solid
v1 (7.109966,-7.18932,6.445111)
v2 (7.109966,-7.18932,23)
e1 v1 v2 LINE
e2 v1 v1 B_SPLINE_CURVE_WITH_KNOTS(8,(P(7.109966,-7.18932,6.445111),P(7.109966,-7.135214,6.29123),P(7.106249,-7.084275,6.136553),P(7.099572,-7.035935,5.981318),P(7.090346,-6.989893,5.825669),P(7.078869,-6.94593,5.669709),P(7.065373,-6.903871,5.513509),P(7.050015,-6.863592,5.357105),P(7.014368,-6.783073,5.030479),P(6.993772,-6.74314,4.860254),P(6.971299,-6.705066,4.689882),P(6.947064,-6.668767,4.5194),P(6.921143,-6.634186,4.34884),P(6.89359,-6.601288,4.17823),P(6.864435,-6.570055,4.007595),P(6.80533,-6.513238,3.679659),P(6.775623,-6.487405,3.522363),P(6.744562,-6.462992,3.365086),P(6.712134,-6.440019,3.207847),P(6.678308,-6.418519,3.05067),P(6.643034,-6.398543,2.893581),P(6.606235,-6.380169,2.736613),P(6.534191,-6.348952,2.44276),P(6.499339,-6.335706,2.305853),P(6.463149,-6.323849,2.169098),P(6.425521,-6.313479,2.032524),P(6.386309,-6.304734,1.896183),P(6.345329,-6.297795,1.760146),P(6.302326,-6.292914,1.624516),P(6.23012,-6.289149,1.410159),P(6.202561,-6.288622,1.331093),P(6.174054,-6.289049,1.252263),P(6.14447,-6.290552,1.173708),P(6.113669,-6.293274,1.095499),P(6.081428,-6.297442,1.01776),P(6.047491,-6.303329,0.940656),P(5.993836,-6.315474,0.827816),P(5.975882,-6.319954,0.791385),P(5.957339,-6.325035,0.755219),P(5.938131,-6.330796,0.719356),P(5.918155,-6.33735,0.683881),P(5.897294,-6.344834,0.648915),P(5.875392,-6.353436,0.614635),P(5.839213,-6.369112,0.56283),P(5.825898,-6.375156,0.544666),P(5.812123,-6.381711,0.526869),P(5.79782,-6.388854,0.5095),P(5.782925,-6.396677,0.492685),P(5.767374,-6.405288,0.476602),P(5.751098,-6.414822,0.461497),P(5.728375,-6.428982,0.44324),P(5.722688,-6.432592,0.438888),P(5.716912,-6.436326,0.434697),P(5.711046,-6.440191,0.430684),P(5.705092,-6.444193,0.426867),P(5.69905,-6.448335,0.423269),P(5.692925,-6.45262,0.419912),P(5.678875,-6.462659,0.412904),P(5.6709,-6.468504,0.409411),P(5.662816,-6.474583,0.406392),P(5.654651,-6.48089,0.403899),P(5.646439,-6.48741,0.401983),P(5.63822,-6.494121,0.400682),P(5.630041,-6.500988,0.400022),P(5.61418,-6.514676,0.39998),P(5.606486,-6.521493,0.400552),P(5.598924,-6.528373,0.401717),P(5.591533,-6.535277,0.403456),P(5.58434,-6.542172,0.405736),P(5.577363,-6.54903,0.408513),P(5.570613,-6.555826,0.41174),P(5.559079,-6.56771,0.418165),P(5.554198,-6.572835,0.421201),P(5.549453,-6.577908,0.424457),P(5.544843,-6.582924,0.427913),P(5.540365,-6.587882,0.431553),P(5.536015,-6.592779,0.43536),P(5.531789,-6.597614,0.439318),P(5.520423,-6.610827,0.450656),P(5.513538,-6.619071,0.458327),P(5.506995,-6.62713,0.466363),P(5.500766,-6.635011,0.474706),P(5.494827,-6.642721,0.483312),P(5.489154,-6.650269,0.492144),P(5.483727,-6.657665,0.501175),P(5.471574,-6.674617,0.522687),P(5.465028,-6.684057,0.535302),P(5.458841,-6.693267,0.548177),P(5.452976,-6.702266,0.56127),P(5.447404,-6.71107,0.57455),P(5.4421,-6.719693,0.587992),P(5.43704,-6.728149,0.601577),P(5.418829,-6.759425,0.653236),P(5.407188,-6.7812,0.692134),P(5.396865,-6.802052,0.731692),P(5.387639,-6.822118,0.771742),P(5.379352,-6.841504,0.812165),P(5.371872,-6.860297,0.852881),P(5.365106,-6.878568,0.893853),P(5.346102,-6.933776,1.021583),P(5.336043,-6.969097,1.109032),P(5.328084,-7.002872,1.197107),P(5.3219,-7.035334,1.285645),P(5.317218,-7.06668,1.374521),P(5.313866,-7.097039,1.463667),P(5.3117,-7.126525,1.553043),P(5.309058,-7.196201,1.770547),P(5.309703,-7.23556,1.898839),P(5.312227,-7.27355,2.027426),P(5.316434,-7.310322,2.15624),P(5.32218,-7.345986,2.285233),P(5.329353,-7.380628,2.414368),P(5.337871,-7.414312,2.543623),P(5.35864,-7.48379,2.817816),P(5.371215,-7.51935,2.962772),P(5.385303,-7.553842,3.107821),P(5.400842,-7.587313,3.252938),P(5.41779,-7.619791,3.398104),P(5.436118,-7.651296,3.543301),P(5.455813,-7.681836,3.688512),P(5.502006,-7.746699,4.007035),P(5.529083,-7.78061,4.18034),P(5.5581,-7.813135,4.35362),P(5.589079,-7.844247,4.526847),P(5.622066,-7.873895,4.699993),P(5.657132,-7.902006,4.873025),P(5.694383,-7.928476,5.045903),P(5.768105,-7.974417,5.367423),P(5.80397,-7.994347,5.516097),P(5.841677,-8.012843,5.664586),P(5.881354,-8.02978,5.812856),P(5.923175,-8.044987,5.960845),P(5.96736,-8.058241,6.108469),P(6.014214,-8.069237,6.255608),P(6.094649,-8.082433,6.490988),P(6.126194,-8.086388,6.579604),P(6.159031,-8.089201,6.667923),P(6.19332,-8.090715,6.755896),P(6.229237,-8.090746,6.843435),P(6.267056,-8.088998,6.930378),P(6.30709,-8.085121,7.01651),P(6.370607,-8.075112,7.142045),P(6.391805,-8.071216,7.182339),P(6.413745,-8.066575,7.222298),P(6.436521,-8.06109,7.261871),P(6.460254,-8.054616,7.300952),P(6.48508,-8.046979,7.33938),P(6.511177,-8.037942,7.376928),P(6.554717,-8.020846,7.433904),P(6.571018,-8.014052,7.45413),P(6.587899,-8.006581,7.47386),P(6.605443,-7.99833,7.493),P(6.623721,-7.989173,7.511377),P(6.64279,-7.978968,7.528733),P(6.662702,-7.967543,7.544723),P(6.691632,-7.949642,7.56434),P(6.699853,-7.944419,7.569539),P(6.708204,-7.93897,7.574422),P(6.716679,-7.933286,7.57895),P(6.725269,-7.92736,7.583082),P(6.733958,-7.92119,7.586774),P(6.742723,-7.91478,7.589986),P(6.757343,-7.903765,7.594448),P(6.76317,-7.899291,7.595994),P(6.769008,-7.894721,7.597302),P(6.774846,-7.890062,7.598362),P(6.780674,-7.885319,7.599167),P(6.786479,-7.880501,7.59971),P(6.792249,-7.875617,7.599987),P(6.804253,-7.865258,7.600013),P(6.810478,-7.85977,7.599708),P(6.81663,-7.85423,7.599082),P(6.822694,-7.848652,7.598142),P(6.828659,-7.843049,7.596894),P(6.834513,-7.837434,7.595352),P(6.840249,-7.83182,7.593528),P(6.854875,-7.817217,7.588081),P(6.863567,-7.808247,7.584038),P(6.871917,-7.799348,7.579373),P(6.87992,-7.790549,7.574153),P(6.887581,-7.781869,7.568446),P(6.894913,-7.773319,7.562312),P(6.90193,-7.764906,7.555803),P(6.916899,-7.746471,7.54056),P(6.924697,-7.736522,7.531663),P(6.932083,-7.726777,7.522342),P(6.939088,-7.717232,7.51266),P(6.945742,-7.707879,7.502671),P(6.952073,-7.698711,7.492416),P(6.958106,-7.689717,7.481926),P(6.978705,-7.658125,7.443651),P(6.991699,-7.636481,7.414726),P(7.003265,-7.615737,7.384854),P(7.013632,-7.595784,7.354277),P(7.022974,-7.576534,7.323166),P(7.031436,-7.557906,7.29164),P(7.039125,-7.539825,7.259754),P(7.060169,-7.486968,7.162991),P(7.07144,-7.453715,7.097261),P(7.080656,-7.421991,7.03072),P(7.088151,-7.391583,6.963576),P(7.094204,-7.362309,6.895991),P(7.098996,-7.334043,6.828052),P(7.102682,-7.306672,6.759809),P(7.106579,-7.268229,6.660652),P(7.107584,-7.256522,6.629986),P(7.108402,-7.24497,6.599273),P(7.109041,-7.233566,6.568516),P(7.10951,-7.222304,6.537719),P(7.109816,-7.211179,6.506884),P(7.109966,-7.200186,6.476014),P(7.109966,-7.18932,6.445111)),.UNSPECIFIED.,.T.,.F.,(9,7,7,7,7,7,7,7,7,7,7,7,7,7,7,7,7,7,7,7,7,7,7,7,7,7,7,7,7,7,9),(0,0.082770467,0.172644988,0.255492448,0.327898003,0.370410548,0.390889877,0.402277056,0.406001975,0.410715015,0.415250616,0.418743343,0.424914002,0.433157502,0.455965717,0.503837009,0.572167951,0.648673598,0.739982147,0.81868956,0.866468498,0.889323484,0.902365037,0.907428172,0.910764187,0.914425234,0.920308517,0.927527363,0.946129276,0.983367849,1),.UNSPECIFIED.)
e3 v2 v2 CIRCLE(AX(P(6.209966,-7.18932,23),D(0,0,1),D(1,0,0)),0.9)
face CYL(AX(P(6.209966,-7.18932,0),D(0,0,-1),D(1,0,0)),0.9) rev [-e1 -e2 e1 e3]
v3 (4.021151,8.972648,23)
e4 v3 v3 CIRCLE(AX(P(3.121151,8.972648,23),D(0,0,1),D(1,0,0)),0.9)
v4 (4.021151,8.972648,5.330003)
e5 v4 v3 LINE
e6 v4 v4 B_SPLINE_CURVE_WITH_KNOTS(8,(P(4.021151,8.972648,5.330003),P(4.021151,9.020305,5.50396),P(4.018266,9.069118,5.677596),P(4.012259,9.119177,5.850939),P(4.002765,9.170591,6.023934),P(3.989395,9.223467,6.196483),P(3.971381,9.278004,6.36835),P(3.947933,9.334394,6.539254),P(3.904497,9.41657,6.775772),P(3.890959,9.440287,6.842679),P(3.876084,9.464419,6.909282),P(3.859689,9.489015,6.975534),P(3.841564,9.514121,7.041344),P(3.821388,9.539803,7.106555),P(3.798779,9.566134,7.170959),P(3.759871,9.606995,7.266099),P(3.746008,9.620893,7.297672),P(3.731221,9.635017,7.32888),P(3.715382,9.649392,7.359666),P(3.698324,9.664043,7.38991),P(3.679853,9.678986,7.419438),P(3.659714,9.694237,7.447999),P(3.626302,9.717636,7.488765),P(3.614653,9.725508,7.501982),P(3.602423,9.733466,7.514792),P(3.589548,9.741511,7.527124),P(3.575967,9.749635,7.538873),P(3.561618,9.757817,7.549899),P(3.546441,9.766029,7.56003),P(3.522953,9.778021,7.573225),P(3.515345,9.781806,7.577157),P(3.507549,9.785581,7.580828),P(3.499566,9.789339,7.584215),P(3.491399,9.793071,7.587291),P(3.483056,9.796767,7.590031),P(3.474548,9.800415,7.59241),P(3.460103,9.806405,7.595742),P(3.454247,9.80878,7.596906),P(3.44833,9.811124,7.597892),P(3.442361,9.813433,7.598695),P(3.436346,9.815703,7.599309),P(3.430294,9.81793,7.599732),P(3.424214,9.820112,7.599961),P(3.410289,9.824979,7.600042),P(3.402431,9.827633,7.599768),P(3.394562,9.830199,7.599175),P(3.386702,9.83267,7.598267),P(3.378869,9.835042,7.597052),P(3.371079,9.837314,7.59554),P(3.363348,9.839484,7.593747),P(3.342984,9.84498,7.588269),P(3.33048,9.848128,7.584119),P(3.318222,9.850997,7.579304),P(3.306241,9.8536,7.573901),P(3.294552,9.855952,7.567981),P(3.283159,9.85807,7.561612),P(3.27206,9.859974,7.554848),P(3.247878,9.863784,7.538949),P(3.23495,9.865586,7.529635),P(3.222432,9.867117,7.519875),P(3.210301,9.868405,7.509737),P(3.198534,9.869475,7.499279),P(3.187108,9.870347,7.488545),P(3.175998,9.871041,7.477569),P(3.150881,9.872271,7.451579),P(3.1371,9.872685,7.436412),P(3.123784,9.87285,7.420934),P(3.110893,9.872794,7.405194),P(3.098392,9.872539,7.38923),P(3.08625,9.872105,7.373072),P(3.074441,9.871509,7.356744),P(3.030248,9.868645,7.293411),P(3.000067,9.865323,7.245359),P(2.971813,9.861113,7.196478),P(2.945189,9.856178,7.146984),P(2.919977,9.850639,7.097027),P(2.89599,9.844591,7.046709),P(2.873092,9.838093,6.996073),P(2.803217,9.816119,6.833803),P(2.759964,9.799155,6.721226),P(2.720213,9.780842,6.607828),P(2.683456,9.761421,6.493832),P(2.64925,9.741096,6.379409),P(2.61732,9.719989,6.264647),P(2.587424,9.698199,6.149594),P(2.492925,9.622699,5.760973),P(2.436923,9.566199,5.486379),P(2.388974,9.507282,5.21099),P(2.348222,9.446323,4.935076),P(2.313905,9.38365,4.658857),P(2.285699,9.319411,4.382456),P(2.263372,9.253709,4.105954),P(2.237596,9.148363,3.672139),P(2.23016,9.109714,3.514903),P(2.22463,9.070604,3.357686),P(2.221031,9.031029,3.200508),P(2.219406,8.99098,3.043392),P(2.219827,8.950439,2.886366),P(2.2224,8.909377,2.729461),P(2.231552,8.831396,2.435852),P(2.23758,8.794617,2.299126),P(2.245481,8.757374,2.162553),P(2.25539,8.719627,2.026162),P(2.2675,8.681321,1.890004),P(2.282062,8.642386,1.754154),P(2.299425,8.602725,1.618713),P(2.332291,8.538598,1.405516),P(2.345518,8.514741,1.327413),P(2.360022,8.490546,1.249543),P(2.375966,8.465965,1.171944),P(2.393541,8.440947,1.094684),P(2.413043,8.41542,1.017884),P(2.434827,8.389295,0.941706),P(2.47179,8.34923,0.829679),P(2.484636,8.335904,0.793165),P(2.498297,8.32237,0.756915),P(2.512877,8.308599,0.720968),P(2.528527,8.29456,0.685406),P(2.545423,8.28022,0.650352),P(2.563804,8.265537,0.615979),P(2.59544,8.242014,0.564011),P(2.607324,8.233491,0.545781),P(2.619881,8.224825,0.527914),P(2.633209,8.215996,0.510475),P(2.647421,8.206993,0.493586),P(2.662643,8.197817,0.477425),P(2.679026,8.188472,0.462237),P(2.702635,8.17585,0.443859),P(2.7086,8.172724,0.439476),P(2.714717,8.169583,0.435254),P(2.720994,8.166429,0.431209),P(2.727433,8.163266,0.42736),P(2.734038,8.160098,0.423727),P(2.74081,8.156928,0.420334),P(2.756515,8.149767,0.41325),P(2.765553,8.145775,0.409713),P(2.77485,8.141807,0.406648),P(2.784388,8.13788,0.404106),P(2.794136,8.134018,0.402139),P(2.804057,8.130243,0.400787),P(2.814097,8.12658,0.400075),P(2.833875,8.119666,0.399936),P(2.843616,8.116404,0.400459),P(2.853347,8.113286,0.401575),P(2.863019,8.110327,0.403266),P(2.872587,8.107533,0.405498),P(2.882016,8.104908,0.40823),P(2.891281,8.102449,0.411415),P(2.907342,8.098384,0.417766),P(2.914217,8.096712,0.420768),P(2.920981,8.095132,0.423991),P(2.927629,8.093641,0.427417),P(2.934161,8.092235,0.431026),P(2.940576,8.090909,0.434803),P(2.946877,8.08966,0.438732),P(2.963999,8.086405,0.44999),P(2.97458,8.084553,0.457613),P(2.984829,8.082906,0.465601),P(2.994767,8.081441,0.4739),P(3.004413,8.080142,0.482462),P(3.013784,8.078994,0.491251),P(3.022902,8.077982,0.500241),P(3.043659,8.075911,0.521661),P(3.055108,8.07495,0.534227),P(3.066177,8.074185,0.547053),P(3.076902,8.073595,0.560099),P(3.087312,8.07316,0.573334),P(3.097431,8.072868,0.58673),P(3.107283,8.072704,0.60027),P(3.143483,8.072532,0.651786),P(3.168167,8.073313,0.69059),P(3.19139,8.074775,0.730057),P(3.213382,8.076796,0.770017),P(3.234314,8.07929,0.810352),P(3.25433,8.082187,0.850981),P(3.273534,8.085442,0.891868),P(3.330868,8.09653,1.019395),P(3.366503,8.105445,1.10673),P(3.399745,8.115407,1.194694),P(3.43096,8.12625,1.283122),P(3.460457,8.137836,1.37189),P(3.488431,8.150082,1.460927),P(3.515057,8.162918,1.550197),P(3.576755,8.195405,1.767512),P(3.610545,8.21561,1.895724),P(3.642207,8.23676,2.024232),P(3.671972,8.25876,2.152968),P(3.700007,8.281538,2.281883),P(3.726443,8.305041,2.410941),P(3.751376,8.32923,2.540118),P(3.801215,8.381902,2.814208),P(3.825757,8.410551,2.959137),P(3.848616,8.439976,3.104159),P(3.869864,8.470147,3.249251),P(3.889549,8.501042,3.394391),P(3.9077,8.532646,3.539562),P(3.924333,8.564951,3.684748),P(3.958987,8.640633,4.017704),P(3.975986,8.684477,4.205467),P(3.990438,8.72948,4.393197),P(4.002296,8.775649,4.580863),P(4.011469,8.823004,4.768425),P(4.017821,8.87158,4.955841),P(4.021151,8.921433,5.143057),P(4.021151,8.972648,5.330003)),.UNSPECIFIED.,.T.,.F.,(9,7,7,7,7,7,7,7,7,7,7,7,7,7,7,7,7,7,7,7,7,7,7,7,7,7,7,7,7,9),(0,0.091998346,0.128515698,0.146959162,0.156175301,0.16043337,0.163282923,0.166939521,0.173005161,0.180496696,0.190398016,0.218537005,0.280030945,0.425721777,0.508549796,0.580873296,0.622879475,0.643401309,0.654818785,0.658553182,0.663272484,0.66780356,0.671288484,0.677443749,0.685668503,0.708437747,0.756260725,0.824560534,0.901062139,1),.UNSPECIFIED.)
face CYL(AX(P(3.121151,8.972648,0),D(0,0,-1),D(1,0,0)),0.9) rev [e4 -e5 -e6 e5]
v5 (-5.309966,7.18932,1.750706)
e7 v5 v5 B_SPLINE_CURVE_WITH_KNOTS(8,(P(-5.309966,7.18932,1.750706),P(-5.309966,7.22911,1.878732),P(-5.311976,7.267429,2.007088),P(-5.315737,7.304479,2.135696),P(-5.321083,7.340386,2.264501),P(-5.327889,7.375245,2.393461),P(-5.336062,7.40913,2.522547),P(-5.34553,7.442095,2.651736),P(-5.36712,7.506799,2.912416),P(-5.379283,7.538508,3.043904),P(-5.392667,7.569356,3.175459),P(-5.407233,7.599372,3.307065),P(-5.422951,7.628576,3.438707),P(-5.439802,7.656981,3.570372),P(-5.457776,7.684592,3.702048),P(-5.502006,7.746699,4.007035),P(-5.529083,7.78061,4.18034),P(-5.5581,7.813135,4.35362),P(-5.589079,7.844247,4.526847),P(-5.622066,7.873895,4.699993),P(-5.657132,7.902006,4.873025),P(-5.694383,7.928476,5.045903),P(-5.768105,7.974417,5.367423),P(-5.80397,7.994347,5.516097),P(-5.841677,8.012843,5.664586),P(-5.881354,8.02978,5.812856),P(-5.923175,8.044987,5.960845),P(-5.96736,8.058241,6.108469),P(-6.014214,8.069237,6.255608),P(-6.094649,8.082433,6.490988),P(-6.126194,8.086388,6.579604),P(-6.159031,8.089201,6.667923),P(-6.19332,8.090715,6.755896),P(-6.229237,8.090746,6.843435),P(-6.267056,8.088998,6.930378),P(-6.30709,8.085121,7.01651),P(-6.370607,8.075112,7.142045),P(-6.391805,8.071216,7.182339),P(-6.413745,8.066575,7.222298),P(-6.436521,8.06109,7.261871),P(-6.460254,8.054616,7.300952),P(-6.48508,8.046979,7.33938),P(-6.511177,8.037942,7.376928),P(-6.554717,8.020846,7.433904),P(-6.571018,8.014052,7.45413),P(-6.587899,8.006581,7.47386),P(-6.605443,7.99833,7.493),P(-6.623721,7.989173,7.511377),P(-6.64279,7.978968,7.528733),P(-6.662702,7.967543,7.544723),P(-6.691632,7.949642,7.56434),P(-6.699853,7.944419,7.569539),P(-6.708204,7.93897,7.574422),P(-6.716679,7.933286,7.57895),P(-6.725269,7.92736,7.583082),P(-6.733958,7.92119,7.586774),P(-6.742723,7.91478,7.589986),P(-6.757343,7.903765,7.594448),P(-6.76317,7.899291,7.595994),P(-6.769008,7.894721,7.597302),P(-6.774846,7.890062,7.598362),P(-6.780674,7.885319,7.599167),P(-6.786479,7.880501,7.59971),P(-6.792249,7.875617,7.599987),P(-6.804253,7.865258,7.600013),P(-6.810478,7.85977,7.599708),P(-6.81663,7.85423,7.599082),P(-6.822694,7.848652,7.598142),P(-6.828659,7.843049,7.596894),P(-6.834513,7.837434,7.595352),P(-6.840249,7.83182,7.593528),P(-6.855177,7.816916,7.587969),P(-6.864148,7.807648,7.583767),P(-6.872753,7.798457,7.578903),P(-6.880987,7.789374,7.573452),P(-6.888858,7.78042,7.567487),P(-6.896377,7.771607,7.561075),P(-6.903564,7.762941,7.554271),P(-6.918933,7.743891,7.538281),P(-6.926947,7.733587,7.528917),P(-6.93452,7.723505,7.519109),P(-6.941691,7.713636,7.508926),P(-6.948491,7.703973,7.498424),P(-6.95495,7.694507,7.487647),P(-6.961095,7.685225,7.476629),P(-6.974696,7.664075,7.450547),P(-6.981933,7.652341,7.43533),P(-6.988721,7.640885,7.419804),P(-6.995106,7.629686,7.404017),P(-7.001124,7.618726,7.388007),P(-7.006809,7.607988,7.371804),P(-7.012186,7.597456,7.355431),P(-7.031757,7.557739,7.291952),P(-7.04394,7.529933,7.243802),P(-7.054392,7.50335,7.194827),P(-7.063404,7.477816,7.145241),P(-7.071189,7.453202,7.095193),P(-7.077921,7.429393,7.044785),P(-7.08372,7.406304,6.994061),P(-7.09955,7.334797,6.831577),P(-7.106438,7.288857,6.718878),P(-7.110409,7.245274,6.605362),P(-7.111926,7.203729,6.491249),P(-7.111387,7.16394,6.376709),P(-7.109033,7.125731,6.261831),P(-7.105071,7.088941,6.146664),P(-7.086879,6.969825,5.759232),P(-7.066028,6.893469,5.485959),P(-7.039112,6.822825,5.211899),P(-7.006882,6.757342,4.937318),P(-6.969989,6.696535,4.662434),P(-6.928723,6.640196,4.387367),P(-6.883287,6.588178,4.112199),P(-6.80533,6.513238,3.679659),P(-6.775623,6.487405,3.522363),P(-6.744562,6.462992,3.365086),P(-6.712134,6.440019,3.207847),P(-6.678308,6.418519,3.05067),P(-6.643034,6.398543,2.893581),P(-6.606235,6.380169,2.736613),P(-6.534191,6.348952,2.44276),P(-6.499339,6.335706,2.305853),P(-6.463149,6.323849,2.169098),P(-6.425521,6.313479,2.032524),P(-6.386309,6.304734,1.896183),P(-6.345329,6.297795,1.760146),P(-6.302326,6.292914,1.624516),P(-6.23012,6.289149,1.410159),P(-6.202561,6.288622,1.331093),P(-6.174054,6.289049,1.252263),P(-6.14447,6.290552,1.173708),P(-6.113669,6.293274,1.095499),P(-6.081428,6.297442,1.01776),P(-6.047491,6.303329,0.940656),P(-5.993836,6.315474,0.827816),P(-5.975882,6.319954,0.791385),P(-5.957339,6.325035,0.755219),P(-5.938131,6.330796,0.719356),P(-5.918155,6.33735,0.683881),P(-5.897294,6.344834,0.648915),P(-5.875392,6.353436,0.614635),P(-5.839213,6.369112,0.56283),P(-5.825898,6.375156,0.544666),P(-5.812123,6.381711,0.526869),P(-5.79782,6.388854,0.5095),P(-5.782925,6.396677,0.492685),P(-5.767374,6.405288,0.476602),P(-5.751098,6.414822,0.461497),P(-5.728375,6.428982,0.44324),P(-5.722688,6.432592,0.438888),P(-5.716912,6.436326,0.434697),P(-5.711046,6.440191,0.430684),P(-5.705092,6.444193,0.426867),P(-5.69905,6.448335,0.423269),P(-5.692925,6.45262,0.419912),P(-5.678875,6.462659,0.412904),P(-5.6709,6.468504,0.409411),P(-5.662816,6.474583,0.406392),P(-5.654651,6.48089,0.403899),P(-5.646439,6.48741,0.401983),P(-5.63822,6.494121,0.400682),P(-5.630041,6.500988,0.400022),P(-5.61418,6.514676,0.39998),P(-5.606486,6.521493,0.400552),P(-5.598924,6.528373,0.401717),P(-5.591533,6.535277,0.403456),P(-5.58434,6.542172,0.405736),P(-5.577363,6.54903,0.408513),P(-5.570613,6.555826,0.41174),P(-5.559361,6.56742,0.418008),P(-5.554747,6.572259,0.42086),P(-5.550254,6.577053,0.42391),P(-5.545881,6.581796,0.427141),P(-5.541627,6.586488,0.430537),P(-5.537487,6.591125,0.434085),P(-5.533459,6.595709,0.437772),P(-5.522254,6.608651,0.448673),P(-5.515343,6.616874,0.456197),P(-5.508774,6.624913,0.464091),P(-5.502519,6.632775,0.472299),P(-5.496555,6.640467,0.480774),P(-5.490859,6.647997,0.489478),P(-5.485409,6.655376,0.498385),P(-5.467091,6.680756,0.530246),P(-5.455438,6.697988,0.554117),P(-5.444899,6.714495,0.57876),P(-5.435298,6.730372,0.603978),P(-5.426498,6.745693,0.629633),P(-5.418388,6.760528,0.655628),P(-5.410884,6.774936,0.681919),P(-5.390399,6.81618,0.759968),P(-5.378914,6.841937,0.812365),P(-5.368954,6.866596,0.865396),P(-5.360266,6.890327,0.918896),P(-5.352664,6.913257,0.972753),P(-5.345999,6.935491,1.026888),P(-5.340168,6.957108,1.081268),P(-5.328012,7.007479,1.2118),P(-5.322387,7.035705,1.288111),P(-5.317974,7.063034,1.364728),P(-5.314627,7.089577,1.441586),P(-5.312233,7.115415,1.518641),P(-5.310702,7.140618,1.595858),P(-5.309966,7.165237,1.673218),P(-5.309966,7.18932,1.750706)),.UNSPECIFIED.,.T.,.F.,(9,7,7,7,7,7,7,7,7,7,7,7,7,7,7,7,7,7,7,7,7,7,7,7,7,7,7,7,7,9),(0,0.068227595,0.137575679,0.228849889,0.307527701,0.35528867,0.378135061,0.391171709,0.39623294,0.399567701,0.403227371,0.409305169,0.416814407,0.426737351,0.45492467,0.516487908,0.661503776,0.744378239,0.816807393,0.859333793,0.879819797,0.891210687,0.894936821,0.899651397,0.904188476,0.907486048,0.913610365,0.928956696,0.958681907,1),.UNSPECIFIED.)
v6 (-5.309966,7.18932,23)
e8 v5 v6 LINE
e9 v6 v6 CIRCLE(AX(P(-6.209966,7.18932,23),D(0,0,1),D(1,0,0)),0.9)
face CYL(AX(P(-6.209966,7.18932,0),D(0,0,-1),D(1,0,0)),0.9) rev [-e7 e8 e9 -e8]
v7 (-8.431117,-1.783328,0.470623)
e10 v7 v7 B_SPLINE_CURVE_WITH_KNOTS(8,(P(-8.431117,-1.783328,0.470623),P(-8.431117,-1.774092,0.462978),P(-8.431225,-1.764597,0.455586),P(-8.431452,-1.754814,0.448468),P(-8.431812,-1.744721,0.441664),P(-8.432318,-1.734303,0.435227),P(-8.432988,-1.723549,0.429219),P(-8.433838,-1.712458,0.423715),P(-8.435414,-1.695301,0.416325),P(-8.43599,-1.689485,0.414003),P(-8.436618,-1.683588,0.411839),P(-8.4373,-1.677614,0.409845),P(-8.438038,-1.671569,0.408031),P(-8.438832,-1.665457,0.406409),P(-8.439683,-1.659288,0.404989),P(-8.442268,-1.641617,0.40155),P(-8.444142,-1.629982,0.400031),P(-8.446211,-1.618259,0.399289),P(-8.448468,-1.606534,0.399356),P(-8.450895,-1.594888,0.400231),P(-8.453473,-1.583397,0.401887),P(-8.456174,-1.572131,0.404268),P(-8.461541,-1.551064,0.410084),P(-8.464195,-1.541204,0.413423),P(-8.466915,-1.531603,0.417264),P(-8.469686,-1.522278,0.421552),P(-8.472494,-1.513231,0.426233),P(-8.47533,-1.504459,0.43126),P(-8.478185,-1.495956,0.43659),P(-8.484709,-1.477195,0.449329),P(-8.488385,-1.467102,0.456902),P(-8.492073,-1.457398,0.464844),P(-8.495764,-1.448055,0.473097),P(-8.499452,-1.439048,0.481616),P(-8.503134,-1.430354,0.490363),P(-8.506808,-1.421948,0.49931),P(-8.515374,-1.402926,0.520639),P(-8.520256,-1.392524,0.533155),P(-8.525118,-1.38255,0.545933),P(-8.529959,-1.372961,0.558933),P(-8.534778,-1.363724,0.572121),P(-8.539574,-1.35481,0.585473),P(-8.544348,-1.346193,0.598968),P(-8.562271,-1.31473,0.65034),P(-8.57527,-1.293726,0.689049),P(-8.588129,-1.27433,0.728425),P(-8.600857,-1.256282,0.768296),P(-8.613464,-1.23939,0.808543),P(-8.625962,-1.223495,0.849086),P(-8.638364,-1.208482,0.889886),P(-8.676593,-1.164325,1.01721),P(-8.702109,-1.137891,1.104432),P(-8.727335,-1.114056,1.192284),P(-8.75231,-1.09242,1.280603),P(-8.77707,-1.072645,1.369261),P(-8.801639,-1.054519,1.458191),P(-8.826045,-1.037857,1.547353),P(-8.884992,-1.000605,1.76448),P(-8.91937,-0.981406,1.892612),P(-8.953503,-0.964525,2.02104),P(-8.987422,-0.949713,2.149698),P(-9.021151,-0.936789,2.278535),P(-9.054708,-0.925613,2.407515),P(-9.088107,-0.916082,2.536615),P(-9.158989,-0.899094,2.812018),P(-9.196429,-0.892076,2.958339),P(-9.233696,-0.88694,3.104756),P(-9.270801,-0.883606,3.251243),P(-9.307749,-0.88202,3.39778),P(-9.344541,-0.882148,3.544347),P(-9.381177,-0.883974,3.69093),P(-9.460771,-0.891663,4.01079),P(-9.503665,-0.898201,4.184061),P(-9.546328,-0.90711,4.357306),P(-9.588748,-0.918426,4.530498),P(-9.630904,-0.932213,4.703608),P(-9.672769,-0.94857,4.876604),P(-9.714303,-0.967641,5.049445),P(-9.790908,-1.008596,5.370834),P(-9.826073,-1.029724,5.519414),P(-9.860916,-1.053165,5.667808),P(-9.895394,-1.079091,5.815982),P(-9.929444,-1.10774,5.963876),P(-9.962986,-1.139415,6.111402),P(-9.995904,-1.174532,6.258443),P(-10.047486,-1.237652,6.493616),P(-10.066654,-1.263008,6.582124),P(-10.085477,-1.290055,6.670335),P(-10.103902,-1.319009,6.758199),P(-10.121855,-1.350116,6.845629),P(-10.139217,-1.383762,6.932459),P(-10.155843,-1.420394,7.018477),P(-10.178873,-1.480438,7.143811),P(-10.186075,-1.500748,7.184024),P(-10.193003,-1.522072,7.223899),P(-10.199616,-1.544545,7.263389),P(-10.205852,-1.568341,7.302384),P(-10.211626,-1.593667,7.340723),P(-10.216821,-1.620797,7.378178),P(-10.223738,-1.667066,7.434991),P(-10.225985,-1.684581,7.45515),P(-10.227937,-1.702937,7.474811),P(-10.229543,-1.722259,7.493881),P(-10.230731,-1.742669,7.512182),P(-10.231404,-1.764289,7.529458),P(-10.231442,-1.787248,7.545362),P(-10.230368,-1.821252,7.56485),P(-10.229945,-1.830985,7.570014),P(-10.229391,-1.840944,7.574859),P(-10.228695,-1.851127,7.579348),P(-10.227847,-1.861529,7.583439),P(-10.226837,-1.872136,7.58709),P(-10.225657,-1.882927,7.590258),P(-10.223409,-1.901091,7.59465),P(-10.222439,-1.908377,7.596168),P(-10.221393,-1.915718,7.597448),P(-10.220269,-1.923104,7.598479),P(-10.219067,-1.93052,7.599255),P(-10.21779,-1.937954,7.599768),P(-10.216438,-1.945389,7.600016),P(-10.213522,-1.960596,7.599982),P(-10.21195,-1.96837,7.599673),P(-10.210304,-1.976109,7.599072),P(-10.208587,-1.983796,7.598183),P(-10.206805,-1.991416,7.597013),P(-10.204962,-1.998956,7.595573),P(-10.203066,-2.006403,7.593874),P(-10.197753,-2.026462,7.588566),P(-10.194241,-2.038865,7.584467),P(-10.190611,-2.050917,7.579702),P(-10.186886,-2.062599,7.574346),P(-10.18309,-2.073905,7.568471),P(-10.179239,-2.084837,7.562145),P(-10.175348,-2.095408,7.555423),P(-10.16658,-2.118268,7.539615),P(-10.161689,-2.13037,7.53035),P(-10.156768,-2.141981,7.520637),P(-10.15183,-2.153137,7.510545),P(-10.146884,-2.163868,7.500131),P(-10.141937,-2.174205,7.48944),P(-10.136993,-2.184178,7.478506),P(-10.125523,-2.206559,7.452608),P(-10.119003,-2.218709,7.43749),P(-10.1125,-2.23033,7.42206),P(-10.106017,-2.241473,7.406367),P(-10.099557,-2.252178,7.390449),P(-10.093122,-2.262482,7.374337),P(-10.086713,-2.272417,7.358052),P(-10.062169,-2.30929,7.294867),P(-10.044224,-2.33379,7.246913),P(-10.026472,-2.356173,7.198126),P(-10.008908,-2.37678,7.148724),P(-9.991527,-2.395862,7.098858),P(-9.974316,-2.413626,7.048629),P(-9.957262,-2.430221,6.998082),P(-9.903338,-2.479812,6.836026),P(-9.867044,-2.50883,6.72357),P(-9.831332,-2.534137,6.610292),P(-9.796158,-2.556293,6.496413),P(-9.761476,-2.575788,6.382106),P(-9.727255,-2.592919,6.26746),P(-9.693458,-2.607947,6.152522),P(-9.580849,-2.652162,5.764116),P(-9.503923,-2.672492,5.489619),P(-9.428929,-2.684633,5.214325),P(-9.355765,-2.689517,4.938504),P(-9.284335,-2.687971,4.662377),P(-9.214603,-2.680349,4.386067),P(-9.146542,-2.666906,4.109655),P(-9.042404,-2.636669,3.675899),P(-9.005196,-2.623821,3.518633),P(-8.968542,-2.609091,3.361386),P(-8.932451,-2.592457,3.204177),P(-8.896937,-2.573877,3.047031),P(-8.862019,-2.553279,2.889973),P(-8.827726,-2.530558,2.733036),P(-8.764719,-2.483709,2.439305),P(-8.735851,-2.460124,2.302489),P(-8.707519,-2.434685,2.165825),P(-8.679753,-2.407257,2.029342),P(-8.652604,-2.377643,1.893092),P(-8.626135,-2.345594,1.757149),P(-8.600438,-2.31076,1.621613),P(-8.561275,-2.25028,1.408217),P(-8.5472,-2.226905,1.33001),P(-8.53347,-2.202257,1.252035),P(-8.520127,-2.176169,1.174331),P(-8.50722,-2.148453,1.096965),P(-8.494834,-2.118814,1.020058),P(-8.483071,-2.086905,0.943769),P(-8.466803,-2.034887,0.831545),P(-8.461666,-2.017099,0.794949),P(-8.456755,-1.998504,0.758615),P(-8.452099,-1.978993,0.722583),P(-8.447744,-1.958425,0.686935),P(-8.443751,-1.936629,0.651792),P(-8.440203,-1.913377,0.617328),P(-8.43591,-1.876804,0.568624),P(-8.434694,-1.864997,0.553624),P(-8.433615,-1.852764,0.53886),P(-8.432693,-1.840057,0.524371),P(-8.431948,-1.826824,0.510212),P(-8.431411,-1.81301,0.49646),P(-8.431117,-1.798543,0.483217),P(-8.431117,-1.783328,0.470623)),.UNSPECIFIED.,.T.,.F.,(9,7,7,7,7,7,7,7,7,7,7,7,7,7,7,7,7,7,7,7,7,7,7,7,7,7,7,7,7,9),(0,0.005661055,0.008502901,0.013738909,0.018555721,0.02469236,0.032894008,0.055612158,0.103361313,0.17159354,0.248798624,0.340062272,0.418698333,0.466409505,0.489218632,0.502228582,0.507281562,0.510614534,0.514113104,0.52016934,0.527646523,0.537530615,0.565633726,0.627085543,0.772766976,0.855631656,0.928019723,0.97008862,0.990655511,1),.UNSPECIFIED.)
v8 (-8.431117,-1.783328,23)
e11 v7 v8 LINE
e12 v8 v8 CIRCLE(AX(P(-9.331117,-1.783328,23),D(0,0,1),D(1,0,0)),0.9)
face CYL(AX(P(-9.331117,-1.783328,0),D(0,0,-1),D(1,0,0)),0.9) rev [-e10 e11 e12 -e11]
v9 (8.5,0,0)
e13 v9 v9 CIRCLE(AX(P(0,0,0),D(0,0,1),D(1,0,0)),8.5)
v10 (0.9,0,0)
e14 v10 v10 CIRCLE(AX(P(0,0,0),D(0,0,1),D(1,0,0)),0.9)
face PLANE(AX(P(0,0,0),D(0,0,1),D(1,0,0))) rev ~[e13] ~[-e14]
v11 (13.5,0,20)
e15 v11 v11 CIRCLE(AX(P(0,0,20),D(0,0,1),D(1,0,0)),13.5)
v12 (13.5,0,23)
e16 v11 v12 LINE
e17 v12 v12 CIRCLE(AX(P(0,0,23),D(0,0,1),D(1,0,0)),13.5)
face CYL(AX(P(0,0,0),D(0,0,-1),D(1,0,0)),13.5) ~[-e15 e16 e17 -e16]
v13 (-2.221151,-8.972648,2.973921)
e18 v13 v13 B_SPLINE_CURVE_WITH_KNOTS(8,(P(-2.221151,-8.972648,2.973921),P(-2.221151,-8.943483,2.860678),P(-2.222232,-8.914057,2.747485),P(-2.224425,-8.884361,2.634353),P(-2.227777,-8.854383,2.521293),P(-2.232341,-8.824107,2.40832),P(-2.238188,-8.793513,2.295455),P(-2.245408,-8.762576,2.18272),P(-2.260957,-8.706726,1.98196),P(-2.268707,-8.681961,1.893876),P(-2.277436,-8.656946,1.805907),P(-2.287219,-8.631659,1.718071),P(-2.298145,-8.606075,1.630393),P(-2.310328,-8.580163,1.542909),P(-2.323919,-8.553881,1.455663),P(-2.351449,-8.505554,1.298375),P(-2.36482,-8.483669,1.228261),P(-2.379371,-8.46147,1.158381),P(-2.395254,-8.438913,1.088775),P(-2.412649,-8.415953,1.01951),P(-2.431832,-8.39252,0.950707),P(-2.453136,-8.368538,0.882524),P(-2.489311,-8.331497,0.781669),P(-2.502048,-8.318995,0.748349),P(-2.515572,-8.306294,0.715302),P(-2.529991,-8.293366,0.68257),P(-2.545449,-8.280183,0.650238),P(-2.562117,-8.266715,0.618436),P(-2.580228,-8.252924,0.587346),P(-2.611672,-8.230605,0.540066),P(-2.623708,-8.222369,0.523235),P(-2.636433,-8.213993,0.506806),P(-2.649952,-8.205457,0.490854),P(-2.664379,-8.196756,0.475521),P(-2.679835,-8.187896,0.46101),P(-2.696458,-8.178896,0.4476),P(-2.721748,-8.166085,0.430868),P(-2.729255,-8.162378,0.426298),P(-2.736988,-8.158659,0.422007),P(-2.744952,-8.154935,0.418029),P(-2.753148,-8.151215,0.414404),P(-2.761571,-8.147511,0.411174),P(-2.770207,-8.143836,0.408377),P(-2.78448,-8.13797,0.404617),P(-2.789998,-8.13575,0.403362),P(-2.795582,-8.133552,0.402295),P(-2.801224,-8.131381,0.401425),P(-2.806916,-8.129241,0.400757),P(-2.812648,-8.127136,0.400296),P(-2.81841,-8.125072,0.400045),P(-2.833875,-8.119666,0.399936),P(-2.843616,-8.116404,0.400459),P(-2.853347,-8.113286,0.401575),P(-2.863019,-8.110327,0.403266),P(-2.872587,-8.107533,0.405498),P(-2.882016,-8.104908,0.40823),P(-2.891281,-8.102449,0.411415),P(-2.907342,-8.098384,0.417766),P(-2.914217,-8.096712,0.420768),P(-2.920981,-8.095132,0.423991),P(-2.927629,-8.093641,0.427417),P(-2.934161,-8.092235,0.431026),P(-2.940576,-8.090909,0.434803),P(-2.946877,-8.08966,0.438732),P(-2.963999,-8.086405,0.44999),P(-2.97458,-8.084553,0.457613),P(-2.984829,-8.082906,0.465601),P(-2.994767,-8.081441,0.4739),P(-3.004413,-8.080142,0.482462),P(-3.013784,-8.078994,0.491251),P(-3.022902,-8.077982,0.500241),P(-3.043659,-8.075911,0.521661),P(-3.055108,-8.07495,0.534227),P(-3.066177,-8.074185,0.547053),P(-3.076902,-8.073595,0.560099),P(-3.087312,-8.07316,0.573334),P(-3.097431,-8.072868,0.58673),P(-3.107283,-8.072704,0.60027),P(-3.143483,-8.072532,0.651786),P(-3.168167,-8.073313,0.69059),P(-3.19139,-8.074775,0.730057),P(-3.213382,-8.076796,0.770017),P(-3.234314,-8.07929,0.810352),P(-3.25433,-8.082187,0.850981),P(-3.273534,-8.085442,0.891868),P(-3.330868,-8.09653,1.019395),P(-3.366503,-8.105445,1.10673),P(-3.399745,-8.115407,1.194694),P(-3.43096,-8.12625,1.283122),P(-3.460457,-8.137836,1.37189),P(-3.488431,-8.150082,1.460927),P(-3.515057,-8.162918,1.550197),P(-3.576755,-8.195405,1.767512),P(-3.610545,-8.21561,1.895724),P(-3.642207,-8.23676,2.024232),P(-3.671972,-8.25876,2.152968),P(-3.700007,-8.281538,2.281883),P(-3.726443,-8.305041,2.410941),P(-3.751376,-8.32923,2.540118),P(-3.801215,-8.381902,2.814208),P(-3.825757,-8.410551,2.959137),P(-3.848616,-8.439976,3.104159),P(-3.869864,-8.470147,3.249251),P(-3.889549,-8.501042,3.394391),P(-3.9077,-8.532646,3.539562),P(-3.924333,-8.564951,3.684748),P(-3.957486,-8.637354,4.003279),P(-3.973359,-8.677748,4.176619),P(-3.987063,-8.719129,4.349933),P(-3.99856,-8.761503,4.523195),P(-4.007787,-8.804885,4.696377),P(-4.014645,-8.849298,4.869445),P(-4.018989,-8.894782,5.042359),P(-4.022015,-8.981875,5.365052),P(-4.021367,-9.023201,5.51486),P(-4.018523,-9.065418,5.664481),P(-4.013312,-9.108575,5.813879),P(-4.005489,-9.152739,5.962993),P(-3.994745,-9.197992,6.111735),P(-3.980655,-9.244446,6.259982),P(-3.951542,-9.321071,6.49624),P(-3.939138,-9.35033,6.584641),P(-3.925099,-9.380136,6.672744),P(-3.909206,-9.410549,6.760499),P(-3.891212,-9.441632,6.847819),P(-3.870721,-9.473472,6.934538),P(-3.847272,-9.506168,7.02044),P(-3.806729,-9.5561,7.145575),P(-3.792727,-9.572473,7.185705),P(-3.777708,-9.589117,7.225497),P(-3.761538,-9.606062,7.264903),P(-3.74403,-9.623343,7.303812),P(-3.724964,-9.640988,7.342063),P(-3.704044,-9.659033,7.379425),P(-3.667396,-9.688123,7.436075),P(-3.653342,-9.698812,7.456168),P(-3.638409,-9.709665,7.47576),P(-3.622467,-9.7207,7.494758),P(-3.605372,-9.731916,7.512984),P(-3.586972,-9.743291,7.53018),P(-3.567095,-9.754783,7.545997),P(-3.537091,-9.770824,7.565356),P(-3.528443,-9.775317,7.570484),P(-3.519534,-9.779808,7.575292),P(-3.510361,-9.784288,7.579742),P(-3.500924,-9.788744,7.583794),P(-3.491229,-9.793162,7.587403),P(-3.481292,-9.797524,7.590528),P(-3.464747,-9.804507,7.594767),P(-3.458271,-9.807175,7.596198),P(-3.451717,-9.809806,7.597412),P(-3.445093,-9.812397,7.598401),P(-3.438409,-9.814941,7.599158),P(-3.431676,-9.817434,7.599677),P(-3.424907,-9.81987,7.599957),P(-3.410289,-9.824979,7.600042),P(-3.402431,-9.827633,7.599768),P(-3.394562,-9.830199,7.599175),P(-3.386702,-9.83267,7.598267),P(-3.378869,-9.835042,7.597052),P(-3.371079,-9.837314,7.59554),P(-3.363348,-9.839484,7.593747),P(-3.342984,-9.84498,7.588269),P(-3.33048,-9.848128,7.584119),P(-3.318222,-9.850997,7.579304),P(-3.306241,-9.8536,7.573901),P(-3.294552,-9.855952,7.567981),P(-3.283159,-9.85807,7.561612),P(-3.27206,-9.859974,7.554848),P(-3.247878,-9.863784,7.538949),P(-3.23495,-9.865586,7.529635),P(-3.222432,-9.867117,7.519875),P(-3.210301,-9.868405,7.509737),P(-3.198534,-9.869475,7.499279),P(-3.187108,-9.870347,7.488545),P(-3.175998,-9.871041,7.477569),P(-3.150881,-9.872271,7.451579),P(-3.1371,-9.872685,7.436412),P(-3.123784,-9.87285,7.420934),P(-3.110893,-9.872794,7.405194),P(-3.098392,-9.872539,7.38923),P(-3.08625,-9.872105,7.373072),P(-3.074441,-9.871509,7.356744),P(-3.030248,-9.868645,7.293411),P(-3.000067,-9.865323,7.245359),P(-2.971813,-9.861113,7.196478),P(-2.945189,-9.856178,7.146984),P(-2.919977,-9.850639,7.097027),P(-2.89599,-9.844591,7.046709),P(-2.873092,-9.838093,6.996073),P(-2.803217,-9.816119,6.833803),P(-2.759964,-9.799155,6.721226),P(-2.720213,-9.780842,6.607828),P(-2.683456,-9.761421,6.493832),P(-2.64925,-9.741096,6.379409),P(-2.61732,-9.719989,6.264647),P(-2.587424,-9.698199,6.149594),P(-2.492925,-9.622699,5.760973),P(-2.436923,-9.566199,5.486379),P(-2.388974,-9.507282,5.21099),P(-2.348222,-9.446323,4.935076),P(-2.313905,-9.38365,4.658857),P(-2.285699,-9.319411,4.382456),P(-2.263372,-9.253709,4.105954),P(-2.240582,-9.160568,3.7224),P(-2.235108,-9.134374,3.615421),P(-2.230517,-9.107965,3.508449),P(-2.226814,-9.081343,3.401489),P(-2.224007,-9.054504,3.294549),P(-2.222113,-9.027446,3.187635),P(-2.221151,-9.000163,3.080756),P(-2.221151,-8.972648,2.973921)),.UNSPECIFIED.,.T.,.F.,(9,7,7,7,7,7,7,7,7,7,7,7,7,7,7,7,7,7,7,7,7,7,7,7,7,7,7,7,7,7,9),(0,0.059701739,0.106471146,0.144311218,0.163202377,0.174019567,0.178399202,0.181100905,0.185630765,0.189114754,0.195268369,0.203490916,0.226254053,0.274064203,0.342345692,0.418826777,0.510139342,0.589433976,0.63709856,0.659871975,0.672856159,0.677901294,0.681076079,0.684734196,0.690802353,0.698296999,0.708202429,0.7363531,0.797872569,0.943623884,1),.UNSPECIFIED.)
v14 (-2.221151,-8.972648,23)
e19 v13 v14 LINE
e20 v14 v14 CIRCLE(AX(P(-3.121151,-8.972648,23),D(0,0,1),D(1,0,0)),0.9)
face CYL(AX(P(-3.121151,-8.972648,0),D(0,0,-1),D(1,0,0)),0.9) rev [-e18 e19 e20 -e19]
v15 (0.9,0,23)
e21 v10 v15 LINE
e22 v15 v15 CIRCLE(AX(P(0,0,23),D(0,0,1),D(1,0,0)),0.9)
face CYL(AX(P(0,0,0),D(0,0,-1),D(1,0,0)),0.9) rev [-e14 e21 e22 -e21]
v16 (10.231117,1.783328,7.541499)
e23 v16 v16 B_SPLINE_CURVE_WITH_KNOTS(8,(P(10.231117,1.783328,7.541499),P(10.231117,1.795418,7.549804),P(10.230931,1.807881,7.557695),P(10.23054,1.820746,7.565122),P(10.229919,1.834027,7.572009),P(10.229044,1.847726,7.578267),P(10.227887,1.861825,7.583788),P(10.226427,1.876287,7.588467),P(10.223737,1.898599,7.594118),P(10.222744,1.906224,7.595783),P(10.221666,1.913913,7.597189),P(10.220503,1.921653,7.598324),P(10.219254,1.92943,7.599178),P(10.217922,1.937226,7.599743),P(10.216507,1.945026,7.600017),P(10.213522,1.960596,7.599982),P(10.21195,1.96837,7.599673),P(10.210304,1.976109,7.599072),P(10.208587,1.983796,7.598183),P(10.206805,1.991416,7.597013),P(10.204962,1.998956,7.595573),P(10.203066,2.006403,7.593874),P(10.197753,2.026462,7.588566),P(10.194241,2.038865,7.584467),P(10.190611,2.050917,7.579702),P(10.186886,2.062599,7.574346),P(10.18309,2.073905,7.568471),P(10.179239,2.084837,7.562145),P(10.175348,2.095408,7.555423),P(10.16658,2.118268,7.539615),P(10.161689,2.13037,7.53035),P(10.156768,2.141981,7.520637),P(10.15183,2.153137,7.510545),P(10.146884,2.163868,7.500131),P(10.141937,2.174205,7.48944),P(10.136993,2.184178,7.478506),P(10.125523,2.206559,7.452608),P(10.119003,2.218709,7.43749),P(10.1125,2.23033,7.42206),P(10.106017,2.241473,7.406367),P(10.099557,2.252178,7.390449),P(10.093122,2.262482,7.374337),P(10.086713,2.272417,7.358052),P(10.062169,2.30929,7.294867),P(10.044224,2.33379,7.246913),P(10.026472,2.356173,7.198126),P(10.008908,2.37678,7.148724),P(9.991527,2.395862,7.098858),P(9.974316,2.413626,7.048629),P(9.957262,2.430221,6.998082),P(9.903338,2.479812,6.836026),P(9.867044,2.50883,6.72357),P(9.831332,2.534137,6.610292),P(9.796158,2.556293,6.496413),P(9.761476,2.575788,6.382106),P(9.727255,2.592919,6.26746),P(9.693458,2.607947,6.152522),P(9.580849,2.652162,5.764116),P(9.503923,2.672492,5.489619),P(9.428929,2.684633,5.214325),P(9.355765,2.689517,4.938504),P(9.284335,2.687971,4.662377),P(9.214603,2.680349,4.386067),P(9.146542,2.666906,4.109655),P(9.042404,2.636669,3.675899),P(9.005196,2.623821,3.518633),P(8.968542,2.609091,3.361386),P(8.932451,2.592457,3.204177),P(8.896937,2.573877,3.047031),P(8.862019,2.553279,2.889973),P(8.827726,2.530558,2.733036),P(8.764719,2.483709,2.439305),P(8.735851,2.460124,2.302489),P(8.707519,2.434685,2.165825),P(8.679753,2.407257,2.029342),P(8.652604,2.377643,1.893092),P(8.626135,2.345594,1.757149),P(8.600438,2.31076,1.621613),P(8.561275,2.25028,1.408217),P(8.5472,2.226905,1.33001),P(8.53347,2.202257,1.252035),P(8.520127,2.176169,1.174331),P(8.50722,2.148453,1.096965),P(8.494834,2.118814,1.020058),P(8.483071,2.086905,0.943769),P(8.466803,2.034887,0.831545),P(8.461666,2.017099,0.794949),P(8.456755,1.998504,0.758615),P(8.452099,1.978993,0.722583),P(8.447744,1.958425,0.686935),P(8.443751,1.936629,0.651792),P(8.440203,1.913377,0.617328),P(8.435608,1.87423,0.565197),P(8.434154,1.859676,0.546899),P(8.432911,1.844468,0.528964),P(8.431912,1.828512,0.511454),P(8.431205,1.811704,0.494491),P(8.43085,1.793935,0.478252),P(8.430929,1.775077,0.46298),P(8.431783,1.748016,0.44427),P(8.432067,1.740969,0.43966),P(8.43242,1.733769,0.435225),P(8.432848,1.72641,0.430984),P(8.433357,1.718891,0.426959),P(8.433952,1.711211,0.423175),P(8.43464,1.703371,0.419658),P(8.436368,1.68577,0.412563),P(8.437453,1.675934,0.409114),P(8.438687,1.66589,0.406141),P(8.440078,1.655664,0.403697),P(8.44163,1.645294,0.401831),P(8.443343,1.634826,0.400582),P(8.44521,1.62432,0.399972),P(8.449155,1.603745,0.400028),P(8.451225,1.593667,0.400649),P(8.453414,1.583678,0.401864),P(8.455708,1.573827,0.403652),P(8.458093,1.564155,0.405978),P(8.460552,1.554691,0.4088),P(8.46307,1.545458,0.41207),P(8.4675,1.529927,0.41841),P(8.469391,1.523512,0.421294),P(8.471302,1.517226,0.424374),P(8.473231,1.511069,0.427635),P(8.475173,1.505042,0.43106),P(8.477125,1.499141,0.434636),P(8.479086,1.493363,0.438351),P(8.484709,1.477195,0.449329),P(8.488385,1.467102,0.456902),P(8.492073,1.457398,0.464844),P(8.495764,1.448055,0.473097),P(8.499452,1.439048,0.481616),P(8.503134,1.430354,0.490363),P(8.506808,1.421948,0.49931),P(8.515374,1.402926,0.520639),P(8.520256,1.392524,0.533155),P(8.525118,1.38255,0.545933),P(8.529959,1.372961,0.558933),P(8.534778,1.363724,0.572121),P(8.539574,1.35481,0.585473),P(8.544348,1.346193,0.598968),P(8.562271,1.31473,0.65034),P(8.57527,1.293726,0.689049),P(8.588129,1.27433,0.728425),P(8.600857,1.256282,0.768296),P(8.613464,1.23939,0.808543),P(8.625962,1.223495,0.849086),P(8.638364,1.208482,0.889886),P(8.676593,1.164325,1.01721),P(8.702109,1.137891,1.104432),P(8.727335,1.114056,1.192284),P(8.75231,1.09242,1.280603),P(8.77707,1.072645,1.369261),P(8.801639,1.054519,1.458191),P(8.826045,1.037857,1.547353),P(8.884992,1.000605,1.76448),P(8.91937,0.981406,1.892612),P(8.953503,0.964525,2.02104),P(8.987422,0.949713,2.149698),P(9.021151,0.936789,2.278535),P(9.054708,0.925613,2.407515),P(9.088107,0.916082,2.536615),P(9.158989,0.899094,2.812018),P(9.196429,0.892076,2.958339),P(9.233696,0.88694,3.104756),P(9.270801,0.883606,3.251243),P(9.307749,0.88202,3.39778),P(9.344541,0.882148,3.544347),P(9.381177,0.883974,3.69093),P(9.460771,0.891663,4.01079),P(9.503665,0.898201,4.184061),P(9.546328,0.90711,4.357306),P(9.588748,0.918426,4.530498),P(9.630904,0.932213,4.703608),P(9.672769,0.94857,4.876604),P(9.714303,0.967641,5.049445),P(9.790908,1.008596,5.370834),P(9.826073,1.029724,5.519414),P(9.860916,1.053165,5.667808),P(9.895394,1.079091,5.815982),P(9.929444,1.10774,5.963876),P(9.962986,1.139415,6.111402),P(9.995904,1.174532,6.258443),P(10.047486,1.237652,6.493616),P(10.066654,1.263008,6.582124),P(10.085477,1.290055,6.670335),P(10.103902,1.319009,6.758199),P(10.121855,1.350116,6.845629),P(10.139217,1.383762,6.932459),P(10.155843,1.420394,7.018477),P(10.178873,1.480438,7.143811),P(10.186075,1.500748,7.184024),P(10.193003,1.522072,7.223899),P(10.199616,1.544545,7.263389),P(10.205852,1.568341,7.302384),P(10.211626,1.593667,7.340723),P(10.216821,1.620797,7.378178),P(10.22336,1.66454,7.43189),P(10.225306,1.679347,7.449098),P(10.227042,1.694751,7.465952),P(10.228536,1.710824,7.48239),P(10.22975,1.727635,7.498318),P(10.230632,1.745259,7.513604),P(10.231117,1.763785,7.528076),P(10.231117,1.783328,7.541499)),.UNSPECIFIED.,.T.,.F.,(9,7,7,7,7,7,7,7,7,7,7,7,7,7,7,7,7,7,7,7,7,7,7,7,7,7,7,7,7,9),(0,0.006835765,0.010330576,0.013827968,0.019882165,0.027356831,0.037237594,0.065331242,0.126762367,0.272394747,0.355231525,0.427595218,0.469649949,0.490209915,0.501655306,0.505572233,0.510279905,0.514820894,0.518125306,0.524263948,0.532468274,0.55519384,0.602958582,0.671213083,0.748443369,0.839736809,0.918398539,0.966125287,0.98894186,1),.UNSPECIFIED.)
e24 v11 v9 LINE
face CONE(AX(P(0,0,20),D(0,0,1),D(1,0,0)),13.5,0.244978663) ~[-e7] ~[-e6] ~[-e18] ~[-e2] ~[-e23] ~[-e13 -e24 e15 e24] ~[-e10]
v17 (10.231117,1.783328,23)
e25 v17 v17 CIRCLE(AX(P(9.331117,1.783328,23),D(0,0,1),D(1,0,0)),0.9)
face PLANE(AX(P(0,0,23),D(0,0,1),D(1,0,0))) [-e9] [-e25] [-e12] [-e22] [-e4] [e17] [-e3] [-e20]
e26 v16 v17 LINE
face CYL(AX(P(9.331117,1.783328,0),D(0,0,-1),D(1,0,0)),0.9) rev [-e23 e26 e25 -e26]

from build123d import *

# Parameters (mm, degrees)
F0_R     = 13.5
F0_R_2   = 0.9
F1_DEPTH = 23


# Not quite as in the source:
# - a fillet or chamfer that OpenCascade refuses, or shapes differently, is made with other operations: its cross-section is extruded or revolved along the edge and cut away or added


with BuildPart() as f1:
    # F0 (on Top) → F1 (new body)
    with BuildSketch(Plane.XY):
        Circle(F0_R)
        with Locations((-3.1211513103, -8.9726481319)):
            Circle(F0_R_2, mode=Mode.SUBTRACT)
        with Locations((-9.3311168766, -1.7833277421)):
            Circle(F0_R_2, mode=Mode.SUBTRACT)
        with Locations((6.2099655662, -7.1893203897)):
            Circle(F0_R_2, mode=Mode.SUBTRACT)
        with Locations((-6.2099655662, 7.1893203897)):
            Circle(F0_R_2, mode=Mode.SUBTRACT)
        Circle(F0_R_2, mode=Mode.SUBTRACT)
        with Locations((9.3311168766, 1.7833277421)):
            Circle(F0_R_2, mode=Mode.SUBTRACT)
        with Locations((3.1211513103, 8.9726481319)):
            Circle(F0_R_2, mode=Mode.SUBTRACT)
    extrude(amount=F1_DEPTH)

    # F2: chamfer of 20 x 5 on 1 edges, made by hand

    # F2_s1 → F2_t2 (revolve, cut)
    with BuildSketch(Plane.XZ):
        Polygon((13.5, 20), (8.5, 0), (13.5, 0), align=None)
    revolve(axis=Axis((0, 0, 0), (0, 0, 1)), mode=Mode.SUBTRACT)


solid = f1.part
